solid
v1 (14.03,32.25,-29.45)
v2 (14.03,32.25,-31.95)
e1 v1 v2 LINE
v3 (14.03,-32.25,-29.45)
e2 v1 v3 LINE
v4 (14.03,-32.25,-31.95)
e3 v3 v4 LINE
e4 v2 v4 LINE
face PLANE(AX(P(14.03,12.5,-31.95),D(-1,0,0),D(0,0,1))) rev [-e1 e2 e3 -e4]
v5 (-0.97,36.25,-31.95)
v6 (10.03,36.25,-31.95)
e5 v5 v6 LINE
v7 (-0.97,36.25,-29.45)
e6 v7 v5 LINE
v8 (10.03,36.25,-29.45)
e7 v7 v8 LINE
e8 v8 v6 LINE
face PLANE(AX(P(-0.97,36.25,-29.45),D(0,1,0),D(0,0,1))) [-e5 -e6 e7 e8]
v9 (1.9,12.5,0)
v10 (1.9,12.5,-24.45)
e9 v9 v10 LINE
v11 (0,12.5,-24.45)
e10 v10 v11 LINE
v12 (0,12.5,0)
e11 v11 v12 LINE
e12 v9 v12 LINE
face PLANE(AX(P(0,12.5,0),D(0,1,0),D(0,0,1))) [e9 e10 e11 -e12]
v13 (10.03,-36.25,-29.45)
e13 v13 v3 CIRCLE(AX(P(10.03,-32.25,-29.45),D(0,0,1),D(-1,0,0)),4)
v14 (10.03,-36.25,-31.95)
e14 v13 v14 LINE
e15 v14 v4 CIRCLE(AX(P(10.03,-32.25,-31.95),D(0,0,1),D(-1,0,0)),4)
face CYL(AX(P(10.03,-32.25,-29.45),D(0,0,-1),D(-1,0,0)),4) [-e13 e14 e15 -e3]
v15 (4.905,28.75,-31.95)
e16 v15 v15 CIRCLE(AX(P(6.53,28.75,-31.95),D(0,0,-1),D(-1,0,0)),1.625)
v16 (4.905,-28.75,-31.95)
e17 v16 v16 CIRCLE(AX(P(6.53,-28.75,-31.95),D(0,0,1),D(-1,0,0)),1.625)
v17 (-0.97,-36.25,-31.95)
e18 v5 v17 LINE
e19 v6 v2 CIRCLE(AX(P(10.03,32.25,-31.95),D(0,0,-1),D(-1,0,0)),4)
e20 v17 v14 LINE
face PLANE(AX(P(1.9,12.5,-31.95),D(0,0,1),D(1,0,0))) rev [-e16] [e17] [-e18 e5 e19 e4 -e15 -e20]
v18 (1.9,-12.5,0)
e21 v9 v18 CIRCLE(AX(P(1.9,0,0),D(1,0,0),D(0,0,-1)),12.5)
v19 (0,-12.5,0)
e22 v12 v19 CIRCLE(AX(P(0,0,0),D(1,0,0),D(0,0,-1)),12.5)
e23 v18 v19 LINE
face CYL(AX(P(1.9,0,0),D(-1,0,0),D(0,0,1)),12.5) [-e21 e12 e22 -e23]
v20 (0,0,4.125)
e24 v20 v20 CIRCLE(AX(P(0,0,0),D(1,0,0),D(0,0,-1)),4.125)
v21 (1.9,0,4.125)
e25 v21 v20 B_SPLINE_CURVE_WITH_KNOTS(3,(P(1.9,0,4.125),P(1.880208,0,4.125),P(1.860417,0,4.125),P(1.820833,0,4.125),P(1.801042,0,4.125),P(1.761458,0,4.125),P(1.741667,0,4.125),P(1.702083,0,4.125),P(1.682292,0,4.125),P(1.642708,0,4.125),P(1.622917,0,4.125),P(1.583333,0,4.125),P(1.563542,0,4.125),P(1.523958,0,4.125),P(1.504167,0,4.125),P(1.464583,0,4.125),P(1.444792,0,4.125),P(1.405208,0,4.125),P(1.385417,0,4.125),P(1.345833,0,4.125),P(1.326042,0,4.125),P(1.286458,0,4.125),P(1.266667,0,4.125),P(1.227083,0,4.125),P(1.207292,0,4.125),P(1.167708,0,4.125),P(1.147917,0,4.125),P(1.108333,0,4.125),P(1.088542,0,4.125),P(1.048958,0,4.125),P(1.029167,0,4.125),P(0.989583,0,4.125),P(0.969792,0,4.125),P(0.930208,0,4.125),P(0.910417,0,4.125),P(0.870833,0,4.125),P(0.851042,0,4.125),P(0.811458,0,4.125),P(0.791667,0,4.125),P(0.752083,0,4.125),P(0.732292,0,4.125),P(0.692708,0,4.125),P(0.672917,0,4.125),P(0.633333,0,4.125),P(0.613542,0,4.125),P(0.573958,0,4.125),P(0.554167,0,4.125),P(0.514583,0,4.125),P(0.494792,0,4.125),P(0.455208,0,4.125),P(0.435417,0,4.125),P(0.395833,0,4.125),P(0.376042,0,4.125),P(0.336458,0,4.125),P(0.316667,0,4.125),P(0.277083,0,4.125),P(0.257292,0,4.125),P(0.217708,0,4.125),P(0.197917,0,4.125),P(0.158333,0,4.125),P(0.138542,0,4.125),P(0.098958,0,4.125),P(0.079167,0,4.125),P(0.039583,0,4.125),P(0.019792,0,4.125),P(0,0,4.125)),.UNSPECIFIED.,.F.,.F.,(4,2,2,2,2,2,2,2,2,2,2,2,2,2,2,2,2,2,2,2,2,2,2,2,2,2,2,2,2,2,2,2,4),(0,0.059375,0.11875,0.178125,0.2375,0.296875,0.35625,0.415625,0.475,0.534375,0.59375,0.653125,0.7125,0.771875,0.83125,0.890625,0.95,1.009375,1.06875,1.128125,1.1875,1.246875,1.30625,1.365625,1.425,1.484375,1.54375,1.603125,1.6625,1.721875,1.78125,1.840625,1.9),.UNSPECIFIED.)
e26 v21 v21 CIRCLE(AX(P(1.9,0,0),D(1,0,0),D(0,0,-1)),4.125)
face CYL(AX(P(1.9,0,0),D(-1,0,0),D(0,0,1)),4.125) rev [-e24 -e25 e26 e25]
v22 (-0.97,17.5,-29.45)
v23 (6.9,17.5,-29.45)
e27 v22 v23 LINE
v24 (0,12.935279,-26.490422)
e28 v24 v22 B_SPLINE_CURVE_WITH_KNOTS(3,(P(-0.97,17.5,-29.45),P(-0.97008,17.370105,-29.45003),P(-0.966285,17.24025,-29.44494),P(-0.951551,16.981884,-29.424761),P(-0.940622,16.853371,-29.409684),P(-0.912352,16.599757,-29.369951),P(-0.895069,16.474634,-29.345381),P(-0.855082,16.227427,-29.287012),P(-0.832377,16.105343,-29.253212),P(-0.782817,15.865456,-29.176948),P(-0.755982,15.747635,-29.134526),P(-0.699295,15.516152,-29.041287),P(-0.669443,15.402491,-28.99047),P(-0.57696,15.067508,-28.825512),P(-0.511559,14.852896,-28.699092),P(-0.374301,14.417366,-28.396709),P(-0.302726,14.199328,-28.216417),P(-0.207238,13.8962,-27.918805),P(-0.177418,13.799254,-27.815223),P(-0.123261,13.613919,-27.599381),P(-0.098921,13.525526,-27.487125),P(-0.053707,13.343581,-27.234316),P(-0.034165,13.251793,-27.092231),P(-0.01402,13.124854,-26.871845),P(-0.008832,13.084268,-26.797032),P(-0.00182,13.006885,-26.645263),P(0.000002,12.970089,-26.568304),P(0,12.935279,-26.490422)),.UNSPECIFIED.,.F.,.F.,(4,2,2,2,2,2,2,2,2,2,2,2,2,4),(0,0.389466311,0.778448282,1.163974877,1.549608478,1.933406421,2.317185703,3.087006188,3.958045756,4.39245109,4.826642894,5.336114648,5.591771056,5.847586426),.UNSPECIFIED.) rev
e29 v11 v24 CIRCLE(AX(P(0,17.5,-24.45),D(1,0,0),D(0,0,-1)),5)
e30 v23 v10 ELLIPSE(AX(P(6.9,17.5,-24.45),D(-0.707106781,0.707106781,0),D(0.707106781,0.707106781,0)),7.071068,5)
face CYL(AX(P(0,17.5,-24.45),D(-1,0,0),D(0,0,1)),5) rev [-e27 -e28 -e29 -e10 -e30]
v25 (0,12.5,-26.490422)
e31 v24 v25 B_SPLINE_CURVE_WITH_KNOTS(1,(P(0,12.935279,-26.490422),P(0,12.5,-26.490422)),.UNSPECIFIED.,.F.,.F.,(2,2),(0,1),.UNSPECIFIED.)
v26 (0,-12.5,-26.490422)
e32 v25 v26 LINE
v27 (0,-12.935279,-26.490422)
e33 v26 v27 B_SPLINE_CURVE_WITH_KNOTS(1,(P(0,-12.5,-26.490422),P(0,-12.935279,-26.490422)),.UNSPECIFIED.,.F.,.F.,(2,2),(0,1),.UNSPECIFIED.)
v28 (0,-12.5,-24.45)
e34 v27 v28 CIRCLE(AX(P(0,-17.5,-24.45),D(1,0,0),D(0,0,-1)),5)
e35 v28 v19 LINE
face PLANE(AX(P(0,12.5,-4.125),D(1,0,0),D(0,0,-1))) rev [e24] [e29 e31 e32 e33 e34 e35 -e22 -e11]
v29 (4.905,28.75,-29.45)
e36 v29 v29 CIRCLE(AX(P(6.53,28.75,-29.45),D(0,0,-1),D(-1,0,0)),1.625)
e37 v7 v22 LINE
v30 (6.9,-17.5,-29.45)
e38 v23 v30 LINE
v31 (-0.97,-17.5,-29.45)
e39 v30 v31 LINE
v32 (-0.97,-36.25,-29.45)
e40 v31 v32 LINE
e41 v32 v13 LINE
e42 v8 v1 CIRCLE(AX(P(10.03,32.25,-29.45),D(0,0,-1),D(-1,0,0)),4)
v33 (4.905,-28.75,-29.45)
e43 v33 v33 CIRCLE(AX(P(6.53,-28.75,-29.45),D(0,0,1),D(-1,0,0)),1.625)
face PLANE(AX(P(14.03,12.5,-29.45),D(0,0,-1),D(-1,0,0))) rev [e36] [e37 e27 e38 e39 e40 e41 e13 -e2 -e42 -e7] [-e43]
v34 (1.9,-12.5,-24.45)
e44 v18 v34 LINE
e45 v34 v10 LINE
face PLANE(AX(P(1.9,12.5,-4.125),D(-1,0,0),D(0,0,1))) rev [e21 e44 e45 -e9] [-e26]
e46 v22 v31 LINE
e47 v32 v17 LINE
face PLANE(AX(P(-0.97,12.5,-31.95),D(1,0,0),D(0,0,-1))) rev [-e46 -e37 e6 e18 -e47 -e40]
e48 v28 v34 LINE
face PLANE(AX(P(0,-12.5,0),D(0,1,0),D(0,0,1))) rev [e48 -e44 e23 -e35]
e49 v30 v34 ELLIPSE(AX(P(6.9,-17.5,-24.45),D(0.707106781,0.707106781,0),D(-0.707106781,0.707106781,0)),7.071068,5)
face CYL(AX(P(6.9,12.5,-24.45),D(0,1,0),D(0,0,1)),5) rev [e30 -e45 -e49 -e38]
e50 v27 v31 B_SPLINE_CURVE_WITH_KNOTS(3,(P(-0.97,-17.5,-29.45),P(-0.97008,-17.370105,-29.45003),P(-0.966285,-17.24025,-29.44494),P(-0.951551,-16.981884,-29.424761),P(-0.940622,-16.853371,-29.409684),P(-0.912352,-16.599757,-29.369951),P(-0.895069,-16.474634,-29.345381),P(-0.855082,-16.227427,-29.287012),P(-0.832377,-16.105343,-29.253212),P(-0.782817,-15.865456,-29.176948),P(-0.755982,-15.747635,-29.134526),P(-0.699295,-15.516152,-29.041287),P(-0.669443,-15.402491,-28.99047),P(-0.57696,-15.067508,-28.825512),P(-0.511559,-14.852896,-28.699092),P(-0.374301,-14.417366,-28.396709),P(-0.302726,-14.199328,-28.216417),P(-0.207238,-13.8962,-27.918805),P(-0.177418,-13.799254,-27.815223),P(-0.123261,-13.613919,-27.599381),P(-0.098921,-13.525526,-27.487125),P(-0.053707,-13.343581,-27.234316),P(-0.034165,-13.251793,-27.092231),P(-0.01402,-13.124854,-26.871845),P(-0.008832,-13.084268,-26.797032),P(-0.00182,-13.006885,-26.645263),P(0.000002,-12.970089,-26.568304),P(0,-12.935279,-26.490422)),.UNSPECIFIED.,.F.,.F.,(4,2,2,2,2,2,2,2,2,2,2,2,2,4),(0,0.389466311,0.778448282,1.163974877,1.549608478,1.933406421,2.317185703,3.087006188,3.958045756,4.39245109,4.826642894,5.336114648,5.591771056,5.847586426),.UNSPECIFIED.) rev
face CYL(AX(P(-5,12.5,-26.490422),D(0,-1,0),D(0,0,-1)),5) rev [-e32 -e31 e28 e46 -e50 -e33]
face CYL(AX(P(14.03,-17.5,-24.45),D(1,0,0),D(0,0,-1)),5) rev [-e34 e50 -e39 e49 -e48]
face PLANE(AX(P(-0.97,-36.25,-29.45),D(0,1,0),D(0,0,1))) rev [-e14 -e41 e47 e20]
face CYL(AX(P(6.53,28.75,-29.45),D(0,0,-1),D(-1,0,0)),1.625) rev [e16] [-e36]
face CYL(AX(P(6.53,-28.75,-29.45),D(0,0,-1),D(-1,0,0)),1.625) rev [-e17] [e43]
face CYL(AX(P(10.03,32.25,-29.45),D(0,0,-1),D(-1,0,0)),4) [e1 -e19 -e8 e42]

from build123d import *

# Parameters (mm, degrees)
SKETCH1_R               = 4.125
BOSS_EXTRUDE1_DEPTH     = 1.9
BOSS_EXTRUDE4_DEPTH     = 2.5
CUT_EXTRUDE2_REACH      = 80.314
SKETCH7_W               = 7
SKETCH7_H               = 16.5
SKETCH7_W_2             = 16
SKETCH7_H_2             = 8
CUT_EXTRUDE3_REACH      = 82.041
SKETCH9_W               = 1.9
SKETCH9_H               = 22.388822383
SKETCH8_W               = 1.9
SKETCH8_H               = 27.825
BOSS_EXTRUDE5_DEPTH     = 12.5
FILLET2_R               = 1
FILLET3_R               = 4
CUT_EXTRUDE4_DEPTH      = 74.103052287
CUT_EXTRUDE4_DEPTH_BACK = 74.103052287
SKETCH10_W              = 78.235731334
SKETCH10_H              = 6.290045588
SKETCH11_W              = 15
SKETCH11_H              = 2.5
BOSS_EXTRUDE6_DEPTH     = 12.5
BOSS_EXTRUDE7_DEPTH     = 2.5
SKETCH14_R              = 1.625
CUT_EXTRUDE5_DEPTH      = 2.5
FILLET4_R               = 5


with BuildPart() as part:
    # Sketch1 → Boss-Extrude1 (new body)
    with BuildSketch(Plane(origin=(0, 0, 0), x_dir=(0, 0, -1), z_dir=(1, 0, 0))):
        with BuildLine():
            Line((0, 12.5), (34.45, 12.5))
            Line((34.45, 12.5), (34.45, -12.5))
            Line((34.45, -12.5), (0, -12.5))
            ThreePointArc((0, -12.5), (-12.5, 0), (0, 12.5))
        make_face()
        with Locations(Location((0, 0, 0), (0, 0, 180))):
            Circle(SKETCH1_R, mode=Mode.SUBTRACT)
    extrude(amount=BOSS_EXTRUDE1_DEPTH)

    # Sketch6 → Boss-Extrude4 (add)
    with BuildSketch(Plane(origin=(0, 0, -34.45), x_dir=(-1, 0, 0), z_dir=(0, 0, -1))):
        Polygon((-8.812505246, 36.25), (53.321583376, 36.25), (53.321583376, -36.25), (6.25, -36.25), (-19.178416624, -36.25), (-19.178416624, 36.25), align=None)
    extrude(amount=-BOSS_EXTRUDE4_DEPTH)

    # Sketch7 → Cut-Extrude2 (cut, up to next)
    with BuildSketch(Plane.XY.offset(-31.95), mode=Mode.PRIVATE) as cut_extrude2_sk1:
        with Locations((-1.711858899, -11.632438111)):
            Rectangle(SKETCH7_W, SKETCH7_H)
    cut_extrude2_tool1 = extrude(cut_extrude2_sk1.sketch, amount=-CUT_EXTRUDE2_REACH, mode=Mode.PRIVATE) & part.part
    # Sketch7 → Cut-Extrude2 (cut, up to next)
    with BuildSketch(Plane.XY.offset(-31.95), mode=Mode.PRIVATE) as cut_extrude2_sk2:
        with Locations((-16.5, 0)):
            Rectangle(SKETCH7_W_2, SKETCH7_H_2)
    cut_extrude2_tool2 = extrude(cut_extrude2_sk2.sketch, amount=-CUT_EXTRUDE2_REACH, mode=Mode.PRIVATE) & part.part
    add(cut_extrude2_tool1.solids().sort_by_distance((-1.711859, -11.632438, -31.95))[0], mode=Mode.SUBTRACT)
    add(cut_extrude2_tool2.solids().sort_by_distance((-16.5, 0, -31.95))[0], mode=Mode.SUBTRACT)

    # Sketch9 → Cut-Extrude3 (cut, up to next)
    with BuildSketch(Plane.XZ.offset(12.5), mode=Mode.PRIVATE) as cut_extrude3_sk1:
        with Locations((0.95, -20.755588809)):
            Rectangle(SKETCH9_W, SKETCH9_H)
    cut_extrude3_tool1 = extrude(cut_extrude3_sk1.sketch, amount=-CUT_EXTRUDE3_REACH, mode=Mode.PRIVATE) & part.part
    add(cut_extrude3_tool1.solids().sort_by_distance((0.95, -12.5, -20.755589))[0], mode=Mode.SUBTRACT)


with BuildPart() as cut_extrude3_piece_1:
    # of the separate pieces the step leaves, piece 1, a body of its own (cut_extrude3_pieces)
    add(part.part.solids().sort_by_distance((-53.321583376, 36.25, -31.95))[0])



with BuildPart() as cut_extrude3_piece_2:
    # of the separate pieces the step leaves, piece 2, a body of its own (cut_extrude3_pieces)
    add(part.part.solids().sort_by_distance((0, 12.5, 0))[0])


with BuildPart() as cut_extrude3_piece_1_1:
    add(cut_extrude3_piece_1.part)

    add(cut_extrude3_piece_2.part)  # Boss-Extrude5 merges Cut-Extrude3 piece 2
    # Sketch8 → Boss-Extrude5 (add, symmetric)
    with BuildSketch(Plane(origin=(0, 0, 0), x_dir=(1, 0, 0), z_dir=(0, 1, 0))):
        with Locations((0.95, 18.0375)):
            Rectangle(SKETCH8_W, SKETCH8_H)
    extrude(amount=BOSS_EXTRUDE5_DEPTH, both=True)

    # Fillet2
    fillet2_edges = [cut_extrude3_piece_1_1.edges().sort_by_distance(p)[0] for p in [
        (-8.5, 4, -33.2),
        (-8.5, -4, -33.2),
        (-24.5, -4, -33.2),
        (-24.5, 4, -33.2),
        (-5.211858899, -19.882438111, -33.2),
        (-5.211858899, -3.382438111, -33.2),
        (1.788141101, -3.382438111, -33.2),
        (1.788141101, -19.882438111, -33.2),
    ]]
    fillet(fillet2_edges, radius=FILLET2_R)

    # Fillet3
    fillet3_edges = [cut_extrude3_piece_1_1.edges().sort_by_distance(p)[0] for p in [
        (19.178416624, 36.25, -33.2),
        (-53.321583376, 36.25, -33.2),
        (-53.321583376, -36.25, -33.2),
        (19.178416624, -36.25, -33.2),
    ]]
    fillet(fillet3_edges, radius=FILLET3_R)

    # Sketch10 → Cut-Extrude4 (cut, two sides: drawn at the far end of the back side and taken through both)
    with BuildSketch(Plane(origin=(0, 0, 0), x_dir=(1, 0, 0), z_dir=(0, 1, 0)).offset(-CUT_EXTRUDE4_DEPTH_BACK)):
        with Locations((-17.391929865, 35.095022794)):
            Rectangle(SKETCH10_W, SKETCH10_H)
    extrude(amount=CUT_EXTRUDE4_DEPTH + CUT_EXTRUDE4_DEPTH_BACK, mode=Mode.SUBTRACT)

    # Sketch11 → Boss-Extrude6 (add, symmetric)
    with BuildSketch(Plane(origin=(0, 0, 0), x_dir=(1, 0, 0), z_dir=(0, 1, 0))):
        with Locations((6.53, 30.7)):
            Rectangle(SKETCH11_W, SKETCH11_H)
    boss_extrude6 = extrude(amount=BOSS_EXTRUDE6_DEPTH, both=True)

    # Sketch13 → Boss-Extrude7 (add)
    with BuildSketch(Plane(origin=(0, 0, -31.95), x_dir=(-1, 0, 0), z_dir=(0, 0, -1))):
        with BuildLine():
            Line((-14.03, 12.5), (0.97, 12.5))
            Line((0.97, 12.5), (0.97, 36.25))
            Line((0.97, 36.25), (-10.03, 36.25))
            ThreePointArc((-10.03, 36.25), (-12.858427125, 35.078427125), (-14.03, 32.25))
            Line((-14.03, 32.25), (-14.03, 12.5))
        make_face()
    boss_extrude7 = extrude(amount=-BOSS_EXTRUDE7_DEPTH)

    # Mirror1: Boss-Extrude6, Boss-Extrude7 across plane
    add(boss_extrude6.mirror(Plane.ZX))
    add(boss_extrude7.mirror(Plane.ZX))

    # Sketch14 → Cut-Extrude5 (cut)
    with BuildSketch(Plane(origin=(0, 0, -31.95), x_dir=(-1, 0, 0), z_dir=(0, 0, -1))):
        with Locations((-6.53, 28.75)):
            Circle(SKETCH14_R)
    cut_extrude5 = extrude(amount=-CUT_EXTRUDE5_DEPTH, mode=Mode.SUBTRACT)

    # Mirror2: Cut-Extrude5 across plane
    add(cut_extrude5.mirror(Plane.ZX), mode=Mode.SUBTRACT)

    # Fillet4
    # the kernel refuses this fillet: 5 mm, written as the material it adds along each edge
    with BuildSketch(Plane(origin=(1.9, -12.5, -29.45), x_dir=(1, 0, 0), z_dir=(0, 1, 0))) as fillet4_piece_1:
        with BuildLine():
            CenterArc((FILLET4_R, -FILLET4_R), FILLET4_R, 90, 90)
            Line((0, -FILLET4_R), (-FILLET4_R * 0.02, -FILLET4_R))
            Line((-FILLET4_R * 0.02, -FILLET4_R), (-FILLET4_R * 0.02, FILLET4_R * 0.02))
            Line((-FILLET4_R * 0.02, FILLET4_R * 0.02), (FILLET4_R, FILLET4_R * 0.02))
            Line((FILLET4_R, FILLET4_R * 0.02), (FILLET4_R, 0))
        make_face()
    extrude(amount=25)
    with BuildSketch(Plane(origin=(0, -12.5, -29.45), x_dir=(-1, 0, 0), z_dir=(0, 1, 0))) as fillet4_piece_2:
        with BuildLine():
            CenterArc((5, 2.959577673), FILLET4_R, 180, 36.293058493)
            Line((0, 2.959577673), (-0.1, 2.959577673))
            Line((-0.1, 2.959577673), (-0.1, 0))
            Line((-0.1, 0), (0, -0.1))
            ThreePointArc((0, -0.1), (0.485, -0.1), (0.8894, -0.059191553))
            Line((0.8894, -0.059191553), (0.97, 0))
        make_face()
    extrude(amount=25)
    with BuildSketch(Plane(origin=(1.9, 12.5, -29.45), x_dir=(0, 0, 1), z_dir=(-1, 0, 0)), Plane(origin=(1.9, -12.5, -29.45), x_dir=(0, -1, 0), z_dir=(-1, 0, 0))) as fillet4_piece_3:
        with BuildLine():
            CenterArc((FILLET4_R, FILLET4_R), FILLET4_R, 180, 90)
            Line((0, FILLET4_R), (-FILLET4_R * 0.02, FILLET4_R))
            Line((-FILLET4_R * 0.02, FILLET4_R), (-FILLET4_R * 0.02, -FILLET4_R * 0.02))
            Line((-FILLET4_R * 0.02, -FILLET4_R * 0.02), (FILLET4_R, -FILLET4_R * 0.02))
            Line((FILLET4_R, -FILLET4_R * 0.02), (FILLET4_R, 0))
        make_face()
    extrude(amount=1.9)
    with BuildSketch(Plane(origin=(1.9, -25, -29.45), x_dir=(1, 0, 0), z_dir=(0, 1, 0))) as fillet4_piece_4a_section:
        with BuildLine():
            CenterArc((FILLET4_R, -FILLET4_R), FILLET4_R, 90, 90)
            Line((0, -FILLET4_R), (-FILLET4_R * 0.02, -FILLET4_R))
            Line((-FILLET4_R * 0.02, -FILLET4_R), (-FILLET4_R * 0.02, FILLET4_R * 0.02))
            Line((-FILLET4_R * 0.02, FILLET4_R * 0.02), (FILLET4_R, FILLET4_R * 0.02))
            Line((FILLET4_R, FILLET4_R * 0.02), (FILLET4_R, 0))
        make_face()
    fillet4_piece_4a = extrude(amount=37.5, mode=Mode.PRIVATE)
    fillet4_piece_4a = split(fillet4_piece_4a, bisect_by=Plane(origin=(3.031975571, -12.5, -28.318024429), z_dir=(0, -1, 0)), keep=Keep.TOP, mode=Mode.PRIVATE)
    with BuildSketch(Plane(origin=(14.4, -12.5, -29.45), x_dir=(0, -1, 0), z_dir=(-1, 0, 0))) as fillet4_piece_4b_section:
        with BuildLine():
            CenterArc((FILLET4_R, FILLET4_R), FILLET4_R, 180, 90)
            Line((0, FILLET4_R), (-FILLET4_R * 0.02, FILLET4_R))
            Line((-FILLET4_R * 0.02, FILLET4_R), (-FILLET4_R * 0.02, -FILLET4_R * 0.02))
            Line((-FILLET4_R * 0.02, -FILLET4_R * 0.02), (FILLET4_R, -FILLET4_R * 0.02))
            Line((FILLET4_R, -FILLET4_R * 0.02), (FILLET4_R, 0))
        make_face()
    fillet4_piece_4b = extrude(amount=14.4, mode=Mode.PRIVATE)
    fillet4_piece_4b = split(fillet4_piece_4b, bisect_by=Plane(origin=(14.03, -13.631975571, -28.318024429), z_dir=(-1, 0, 0)), keep=Keep.TOP, mode=Mode.PRIVATE)
    fillet4_piece_4b = split(fillet4_piece_4b, bisect_by=Plane(origin=(1.9, -13.631975571, -28.318024429), z_dir=(1, 0, 0)), keep=Keep.TOP, mode=Mode.PRIVATE)
    fillet4_piece_4 = fillet4_piece_4a & fillet4_piece_4b
    add(fillet4_piece_4)
    with BuildSketch(Plane(origin=(14.4, 12.5, -29.45), x_dir=(0, 0, 1), z_dir=(-1, 0, 0))) as fillet4_piece_5a_section:
        with BuildLine():
            CenterArc((FILLET4_R, FILLET4_R), FILLET4_R, 180, 90)
            Line((0, FILLET4_R), (-FILLET4_R * 0.02, FILLET4_R))
            Line((-FILLET4_R * 0.02, FILLET4_R), (-FILLET4_R * 0.02, -FILLET4_R * 0.02))
            Line((-FILLET4_R * 0.02, -FILLET4_R * 0.02), (FILLET4_R, -FILLET4_R * 0.02))
            Line((FILLET4_R, -FILLET4_R * 0.02), (FILLET4_R, 0))
        make_face()
    fillet4_piece_5a = extrude(amount=14.4, mode=Mode.PRIVATE)
    fillet4_piece_5a = split(fillet4_piece_5a, bisect_by=Plane(origin=(1.9, 13.631975571, -28.318024429), z_dir=(1, 0, 0)), keep=Keep.TOP, mode=Mode.PRIVATE)
    fillet4_piece_5a = split(fillet4_piece_5a, bisect_by=Plane(origin=(14.03, 13.631975571, -28.318024429), z_dir=(-1, 0, 0)), keep=Keep.TOP, mode=Mode.PRIVATE)
    with BuildSketch(Plane(origin=(1.9, -12.5, -29.45), x_dir=(1, 0, 0), z_dir=(0, 1, 0))) as fillet4_piece_5b_section:
        with BuildLine():
            CenterArc((FILLET4_R, -FILLET4_R), FILLET4_R, 90, 90)
            Line((0, -FILLET4_R), (-FILLET4_R * 0.02, -FILLET4_R))
            Line((-FILLET4_R * 0.02, -FILLET4_R), (-FILLET4_R * 0.02, FILLET4_R * 0.02))
            Line((-FILLET4_R * 0.02, FILLET4_R * 0.02), (FILLET4_R, FILLET4_R * 0.02))
            Line((FILLET4_R, FILLET4_R * 0.02), (FILLET4_R, 0))
        make_face()
    fillet4_piece_5b = extrude(amount=37.5, mode=Mode.PRIVATE)
    fillet4_piece_5b = split(fillet4_piece_5b, bisect_by=Plane(origin=(3.031975571, 12.5, -28.318024429), z_dir=(0, 1, 0)), keep=Keep.TOP, mode=Mode.PRIVATE)
    fillet4_piece_5 = fillet4_piece_5a & fillet4_piece_5b
    add(fillet4_piece_5)
    with BuildSketch(Plane(origin=(1.9, -12.5, -29.45), x_dir=(0, -1, 0), z_dir=(-1, 0, 0))) as fillet4_piece_6a_section:
        with BuildLine():
            CenterArc((FILLET4_R, FILLET4_R), FILLET4_R, 180, 90)
            Line((0, FILLET4_R), (-FILLET4_R * 0.02, FILLET4_R))
            Line((-FILLET4_R * 0.02, FILLET4_R), (-FILLET4_R * 0.02, -FILLET4_R * 0.02))
            Line((-FILLET4_R * 0.02, -FILLET4_R * 0.02), (FILLET4_R, -FILLET4_R * 0.02))
            Line((FILLET4_R, -FILLET4_R * 0.02), (FILLET4_R, 0))
        make_face()
    fillet4_piece_6a = extrude(amount=14.4, mode=Mode.PRIVATE)
    fillet4_piece_6a = split(fillet4_piece_6a, bisect_by=Plane(origin=(-0.97, -13.631975571, -28.318024429), z_dir=(1, 0, 0)), keep=Keep.TOP, mode=Mode.PRIVATE)
    fillet4_piece_6a = split(fillet4_piece_6a, bisect_by=Plane(origin=(0, -13.631975571, -28.318024429), z_dir=(-1, 0, 0)), keep=Keep.TOP, mode=Mode.PRIVATE)
    with BuildSketch(Plane(origin=(0, -19.898944181, -29.45), x_dir=(-1, 0, 0), z_dir=(0, 1, 0))) as fillet4_piece_6b_section:
        with BuildLine():
            CenterArc((5, 2.959577673), FILLET4_R, 180, 36.293058493)
            Line((0, 2.959577673), (-0.1, 2.959577673))
            Line((-0.1, 2.959577673), (-0.1, 0))
            Line((-0.1, 0), (0, -0.1))
            ThreePointArc((0, -0.1), (0.485, -0.1), (0.8894, -0.059191553))
            Line((0.8894, -0.059191553), (0.97, 0))
        make_face()
    fillet4_piece_6b = extrude(amount=32.398944181, mode=Mode.PRIVATE)
    fillet4_piece_6b = split(fillet4_piece_6b, bisect_by=Plane(origin=(-0.217435867, -12.5, -28.607978011), z_dir=(0, -1, 0)), keep=Keep.TOP, mode=Mode.PRIVATE)
    fillet4_piece_6 = fillet4_piece_6a & fillet4_piece_6b
    add(fillet4_piece_6)
    with BuildSketch(Plane(origin=(1.9, 12.5, -29.45), x_dir=(0, 0, 1), z_dir=(-1, 0, 0))) as fillet4_piece_7a_section:
        with BuildLine():
            CenterArc((FILLET4_R, FILLET4_R), FILLET4_R, 180, 90)
            Line((0, FILLET4_R), (-FILLET4_R * 0.02, FILLET4_R))
            Line((-FILLET4_R * 0.02, FILLET4_R), (-FILLET4_R * 0.02, -FILLET4_R * 0.02))
            Line((-FILLET4_R * 0.02, -FILLET4_R * 0.02), (FILLET4_R, -FILLET4_R * 0.02))
            Line((FILLET4_R, -FILLET4_R * 0.02), (FILLET4_R, 0))
        make_face()
    fillet4_piece_7a = extrude(amount=14.4, mode=Mode.PRIVATE)
    fillet4_piece_7a = split(fillet4_piece_7a, bisect_by=Plane(origin=(0, 13.631975571, -28.318024429), z_dir=(-1, 0, 0)), keep=Keep.TOP, mode=Mode.PRIVATE)
    fillet4_piece_7a = split(fillet4_piece_7a, bisect_by=Plane(origin=(-0.97, 13.631975571, -28.318024429), z_dir=(1, 0, 0)), keep=Keep.TOP, mode=Mode.PRIVATE)
    with BuildSketch(Plane(origin=(0, -12.5, -29.45), x_dir=(-1, 0, 0), z_dir=(0, 1, 0))) as fillet4_piece_7b_section:
        with BuildLine():
            CenterArc((5, 2.959577673), FILLET4_R, 180, 36.293058493)
            Line((0, 2.959577673), (-0.1, 2.959577673))
            Line((-0.1, 2.959577673), (-0.1, 0))
            Line((-0.1, 0), (0, -0.1))
            ThreePointArc((0, -0.1), (0.485, -0.1), (0.8894, -0.059191553))
            Line((0.8894, -0.059191553), (0.97, 0))
        make_face()
    fillet4_piece_7b = extrude(amount=32.398944181, mode=Mode.PRIVATE)
    fillet4_piece_7b = split(fillet4_piece_7b, bisect_by=Plane(origin=(-0.217435867, 12.5, -28.607978011), z_dir=(0, 1, 0)), keep=Keep.TOP, mode=Mode.PRIVATE)
    fillet4_piece_7 = fillet4_piece_7a & fillet4_piece_7b
    add(fillet4_piece_7)


solid = cut_extrude3_piece_1_1.part
